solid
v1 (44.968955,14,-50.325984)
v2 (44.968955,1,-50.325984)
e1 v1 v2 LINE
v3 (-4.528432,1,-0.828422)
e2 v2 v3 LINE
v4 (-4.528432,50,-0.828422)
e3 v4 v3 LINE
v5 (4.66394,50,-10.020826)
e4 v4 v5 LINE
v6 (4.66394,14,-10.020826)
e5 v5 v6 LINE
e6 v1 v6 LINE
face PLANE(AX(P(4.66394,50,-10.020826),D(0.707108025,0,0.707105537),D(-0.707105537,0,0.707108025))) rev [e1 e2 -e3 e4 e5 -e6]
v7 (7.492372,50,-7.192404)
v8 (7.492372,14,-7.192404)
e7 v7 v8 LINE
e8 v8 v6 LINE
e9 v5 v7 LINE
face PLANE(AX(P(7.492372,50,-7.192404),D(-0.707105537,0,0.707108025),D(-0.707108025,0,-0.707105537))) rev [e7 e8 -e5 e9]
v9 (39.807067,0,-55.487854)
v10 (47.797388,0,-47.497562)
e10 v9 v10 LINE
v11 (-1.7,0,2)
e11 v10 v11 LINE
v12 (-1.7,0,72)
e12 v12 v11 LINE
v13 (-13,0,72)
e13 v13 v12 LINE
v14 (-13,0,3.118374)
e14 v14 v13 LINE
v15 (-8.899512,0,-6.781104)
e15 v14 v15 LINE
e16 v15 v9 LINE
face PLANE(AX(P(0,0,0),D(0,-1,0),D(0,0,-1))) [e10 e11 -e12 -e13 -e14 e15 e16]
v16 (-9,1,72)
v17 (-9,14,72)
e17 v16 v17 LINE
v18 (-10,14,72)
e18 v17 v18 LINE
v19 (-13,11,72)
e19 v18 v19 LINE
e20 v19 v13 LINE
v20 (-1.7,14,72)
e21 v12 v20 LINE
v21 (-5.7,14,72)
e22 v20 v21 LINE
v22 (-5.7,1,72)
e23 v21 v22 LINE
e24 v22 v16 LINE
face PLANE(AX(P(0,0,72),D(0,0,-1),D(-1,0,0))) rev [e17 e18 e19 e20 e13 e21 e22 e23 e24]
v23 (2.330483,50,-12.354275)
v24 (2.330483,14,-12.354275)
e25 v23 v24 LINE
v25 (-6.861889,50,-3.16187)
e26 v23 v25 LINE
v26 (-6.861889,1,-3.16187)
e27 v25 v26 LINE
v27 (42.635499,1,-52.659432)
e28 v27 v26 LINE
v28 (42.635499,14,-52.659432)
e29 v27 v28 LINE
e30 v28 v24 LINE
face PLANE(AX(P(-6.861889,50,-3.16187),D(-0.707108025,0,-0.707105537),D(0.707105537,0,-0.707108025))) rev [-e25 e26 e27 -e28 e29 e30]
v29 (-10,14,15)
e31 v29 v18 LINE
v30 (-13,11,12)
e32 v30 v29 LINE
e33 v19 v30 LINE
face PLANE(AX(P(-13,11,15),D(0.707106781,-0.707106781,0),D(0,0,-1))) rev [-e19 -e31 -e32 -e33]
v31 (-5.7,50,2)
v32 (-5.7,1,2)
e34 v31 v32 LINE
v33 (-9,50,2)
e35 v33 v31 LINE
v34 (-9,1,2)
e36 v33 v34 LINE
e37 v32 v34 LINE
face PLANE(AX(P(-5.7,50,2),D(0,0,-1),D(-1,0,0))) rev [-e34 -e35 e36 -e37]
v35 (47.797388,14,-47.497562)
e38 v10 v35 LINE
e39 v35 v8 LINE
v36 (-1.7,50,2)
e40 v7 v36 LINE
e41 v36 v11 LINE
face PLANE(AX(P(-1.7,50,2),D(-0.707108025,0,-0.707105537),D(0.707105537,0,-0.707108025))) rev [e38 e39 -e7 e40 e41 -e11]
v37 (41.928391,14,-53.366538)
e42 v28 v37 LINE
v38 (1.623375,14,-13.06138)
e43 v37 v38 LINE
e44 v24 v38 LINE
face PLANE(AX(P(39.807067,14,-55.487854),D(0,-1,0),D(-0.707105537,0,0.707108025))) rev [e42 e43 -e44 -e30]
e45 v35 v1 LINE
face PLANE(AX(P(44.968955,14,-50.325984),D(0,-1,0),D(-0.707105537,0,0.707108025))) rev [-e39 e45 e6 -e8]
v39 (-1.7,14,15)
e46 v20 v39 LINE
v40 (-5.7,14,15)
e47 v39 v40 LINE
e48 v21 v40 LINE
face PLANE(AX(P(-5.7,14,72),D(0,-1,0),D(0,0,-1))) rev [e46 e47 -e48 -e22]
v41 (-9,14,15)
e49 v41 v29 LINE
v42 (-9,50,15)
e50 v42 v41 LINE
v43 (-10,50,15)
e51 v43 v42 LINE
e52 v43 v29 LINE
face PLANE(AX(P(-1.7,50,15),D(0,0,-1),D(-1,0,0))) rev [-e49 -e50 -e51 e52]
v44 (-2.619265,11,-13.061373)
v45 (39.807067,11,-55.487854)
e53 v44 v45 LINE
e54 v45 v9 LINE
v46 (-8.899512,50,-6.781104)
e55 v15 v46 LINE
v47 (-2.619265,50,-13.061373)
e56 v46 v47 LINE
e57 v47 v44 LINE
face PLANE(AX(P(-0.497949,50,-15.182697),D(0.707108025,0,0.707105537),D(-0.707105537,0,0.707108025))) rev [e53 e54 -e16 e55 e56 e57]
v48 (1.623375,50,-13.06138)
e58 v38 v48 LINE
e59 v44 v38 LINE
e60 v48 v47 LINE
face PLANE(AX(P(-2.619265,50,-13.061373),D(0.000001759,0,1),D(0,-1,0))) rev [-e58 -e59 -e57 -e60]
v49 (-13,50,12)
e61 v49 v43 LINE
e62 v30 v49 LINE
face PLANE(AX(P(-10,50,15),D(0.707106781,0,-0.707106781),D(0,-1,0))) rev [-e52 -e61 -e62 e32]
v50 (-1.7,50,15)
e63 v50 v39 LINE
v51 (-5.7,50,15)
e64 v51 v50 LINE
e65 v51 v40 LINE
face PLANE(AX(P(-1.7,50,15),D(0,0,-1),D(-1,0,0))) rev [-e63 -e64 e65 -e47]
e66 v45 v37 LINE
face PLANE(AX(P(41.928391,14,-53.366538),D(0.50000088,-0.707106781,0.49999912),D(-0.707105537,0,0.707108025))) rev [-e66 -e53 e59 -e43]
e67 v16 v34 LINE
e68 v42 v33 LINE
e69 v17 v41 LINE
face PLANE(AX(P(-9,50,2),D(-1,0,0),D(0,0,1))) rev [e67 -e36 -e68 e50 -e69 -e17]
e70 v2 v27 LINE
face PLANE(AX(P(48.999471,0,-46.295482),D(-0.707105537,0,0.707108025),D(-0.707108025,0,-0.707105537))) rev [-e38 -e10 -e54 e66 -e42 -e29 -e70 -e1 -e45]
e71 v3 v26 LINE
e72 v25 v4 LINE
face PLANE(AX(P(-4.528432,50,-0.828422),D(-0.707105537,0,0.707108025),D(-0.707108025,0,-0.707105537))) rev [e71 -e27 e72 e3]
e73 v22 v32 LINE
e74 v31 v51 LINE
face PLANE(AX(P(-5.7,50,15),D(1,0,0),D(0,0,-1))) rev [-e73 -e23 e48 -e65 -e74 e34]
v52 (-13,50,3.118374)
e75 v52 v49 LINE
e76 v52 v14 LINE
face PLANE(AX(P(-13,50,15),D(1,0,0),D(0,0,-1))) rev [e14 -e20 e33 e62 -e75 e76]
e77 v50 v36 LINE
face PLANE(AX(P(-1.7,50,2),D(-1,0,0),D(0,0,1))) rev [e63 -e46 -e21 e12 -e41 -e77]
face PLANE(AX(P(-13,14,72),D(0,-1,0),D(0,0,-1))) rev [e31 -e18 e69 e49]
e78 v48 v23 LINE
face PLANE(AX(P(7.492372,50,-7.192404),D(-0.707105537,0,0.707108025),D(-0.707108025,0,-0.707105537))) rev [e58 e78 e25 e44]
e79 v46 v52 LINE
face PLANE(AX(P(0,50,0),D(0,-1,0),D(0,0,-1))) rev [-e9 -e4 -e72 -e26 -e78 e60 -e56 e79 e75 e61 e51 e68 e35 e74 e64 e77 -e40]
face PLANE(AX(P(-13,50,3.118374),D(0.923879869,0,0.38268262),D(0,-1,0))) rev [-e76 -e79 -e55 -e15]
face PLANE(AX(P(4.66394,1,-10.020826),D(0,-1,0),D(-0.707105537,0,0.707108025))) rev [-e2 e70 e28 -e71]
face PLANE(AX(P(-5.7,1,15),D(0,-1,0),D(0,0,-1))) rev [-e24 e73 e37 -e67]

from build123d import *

# Parameters (mm, degrees)
BOSS_EXTRUDE1_DEPTH = 50
SKETCH3_W           = 3.3
SKETCH3_H           = 1
BOSS_EXTRUDE2_DEPTH = 13
BOSS_EXTRUDE3_DEPTH = 57
CHAMFER1_START      = -14
CHAMFER1_OUTLINE_W  = 52
CHAMFER1_OUTLINE_H  = 13
CHAMFER1_DEPTH      = 3.182909169
CHAMFER2_SIZE       = 3


with BuildPart() as part:
    # Sketch2 → Boss-Extrude1 (new body)
    with BuildSketch(Plane(origin=(0, 0, 0), x_dir=(1, 0, 0), z_dir=(0, 1, 0))):
        Polygon((-1.7, -2), (-1.7, -15), (-5.7, -15), (-5.7, -2), (-9, -2), (-9, -15), (-13, -15), (-13, 2.680601608), align=None)
    extrude(amount=BOSS_EXTRUDE1_DEPTH)

    # Sketch3 → Boss-Extrude2 (add)
    with BuildSketch(Plane.XY.offset(2)):
        with Locations((-7.35, 0.5)):
            Rectangle(SKETCH3_W, SKETCH3_H)
    extrude(amount=BOSS_EXTRUDE2_DEPTH)

    # Sketch5 → Boss-Extrude3 (add)
    with BuildSketch(Plane.XY.offset(15)):
        Polygon((-13, 0), (-1.7, 0), (-1.7, 14), (-5.7, 14), (-5.7, 1), (-9, 1), (-9, 14), (-13, 14), align=None)
    extrude(amount=BOSS_EXTRUDE3_DEPTH)

    # Mirror1: part across plane


with BuildPart() as part_1:
    add(part.part)
    add(part.part.mirror(Plane(origin=(-0.956063716, 0, 2.308147732), x_dir=(0.9238798691632129, 0, 0.38268261961443256), z_dir=(0.3826826196144326, 0, -0.9238798691632131))))

    # Chamfer1: read off the stored shape, not the designer's step
    # Chamfer1 outline → Chamfer1 (cut)
    with BuildSketch(Plane(origin=(0, 0, 0), x_dir=(0, 1, 0), z_dir=(0.9238798691632129, 0, 0.38268261961443295)).offset(CHAMFER1_START)):
        with Locations((25, 2.5)):
            Rectangle(CHAMFER1_OUTLINE_W, CHAMFER1_OUTLINE_H)
    extrude(amount=CHAMFER1_DEPTH, mode=Mode.SUBTRACT)

    # Chamfer2
    chamfer2_edges = [part_1.edges().sort_by_distance(p)[0] for p in [
        (-13, 32, 15),
        (-13, 14, 43.5),
        (-0.497948704, 32, -15.182696898),
        (19.654559103, 14, -35.335275619),
    ]]
    chamfer(chamfer2_edges, length=CHAMFER2_SIZE)


solid = part_1.part
